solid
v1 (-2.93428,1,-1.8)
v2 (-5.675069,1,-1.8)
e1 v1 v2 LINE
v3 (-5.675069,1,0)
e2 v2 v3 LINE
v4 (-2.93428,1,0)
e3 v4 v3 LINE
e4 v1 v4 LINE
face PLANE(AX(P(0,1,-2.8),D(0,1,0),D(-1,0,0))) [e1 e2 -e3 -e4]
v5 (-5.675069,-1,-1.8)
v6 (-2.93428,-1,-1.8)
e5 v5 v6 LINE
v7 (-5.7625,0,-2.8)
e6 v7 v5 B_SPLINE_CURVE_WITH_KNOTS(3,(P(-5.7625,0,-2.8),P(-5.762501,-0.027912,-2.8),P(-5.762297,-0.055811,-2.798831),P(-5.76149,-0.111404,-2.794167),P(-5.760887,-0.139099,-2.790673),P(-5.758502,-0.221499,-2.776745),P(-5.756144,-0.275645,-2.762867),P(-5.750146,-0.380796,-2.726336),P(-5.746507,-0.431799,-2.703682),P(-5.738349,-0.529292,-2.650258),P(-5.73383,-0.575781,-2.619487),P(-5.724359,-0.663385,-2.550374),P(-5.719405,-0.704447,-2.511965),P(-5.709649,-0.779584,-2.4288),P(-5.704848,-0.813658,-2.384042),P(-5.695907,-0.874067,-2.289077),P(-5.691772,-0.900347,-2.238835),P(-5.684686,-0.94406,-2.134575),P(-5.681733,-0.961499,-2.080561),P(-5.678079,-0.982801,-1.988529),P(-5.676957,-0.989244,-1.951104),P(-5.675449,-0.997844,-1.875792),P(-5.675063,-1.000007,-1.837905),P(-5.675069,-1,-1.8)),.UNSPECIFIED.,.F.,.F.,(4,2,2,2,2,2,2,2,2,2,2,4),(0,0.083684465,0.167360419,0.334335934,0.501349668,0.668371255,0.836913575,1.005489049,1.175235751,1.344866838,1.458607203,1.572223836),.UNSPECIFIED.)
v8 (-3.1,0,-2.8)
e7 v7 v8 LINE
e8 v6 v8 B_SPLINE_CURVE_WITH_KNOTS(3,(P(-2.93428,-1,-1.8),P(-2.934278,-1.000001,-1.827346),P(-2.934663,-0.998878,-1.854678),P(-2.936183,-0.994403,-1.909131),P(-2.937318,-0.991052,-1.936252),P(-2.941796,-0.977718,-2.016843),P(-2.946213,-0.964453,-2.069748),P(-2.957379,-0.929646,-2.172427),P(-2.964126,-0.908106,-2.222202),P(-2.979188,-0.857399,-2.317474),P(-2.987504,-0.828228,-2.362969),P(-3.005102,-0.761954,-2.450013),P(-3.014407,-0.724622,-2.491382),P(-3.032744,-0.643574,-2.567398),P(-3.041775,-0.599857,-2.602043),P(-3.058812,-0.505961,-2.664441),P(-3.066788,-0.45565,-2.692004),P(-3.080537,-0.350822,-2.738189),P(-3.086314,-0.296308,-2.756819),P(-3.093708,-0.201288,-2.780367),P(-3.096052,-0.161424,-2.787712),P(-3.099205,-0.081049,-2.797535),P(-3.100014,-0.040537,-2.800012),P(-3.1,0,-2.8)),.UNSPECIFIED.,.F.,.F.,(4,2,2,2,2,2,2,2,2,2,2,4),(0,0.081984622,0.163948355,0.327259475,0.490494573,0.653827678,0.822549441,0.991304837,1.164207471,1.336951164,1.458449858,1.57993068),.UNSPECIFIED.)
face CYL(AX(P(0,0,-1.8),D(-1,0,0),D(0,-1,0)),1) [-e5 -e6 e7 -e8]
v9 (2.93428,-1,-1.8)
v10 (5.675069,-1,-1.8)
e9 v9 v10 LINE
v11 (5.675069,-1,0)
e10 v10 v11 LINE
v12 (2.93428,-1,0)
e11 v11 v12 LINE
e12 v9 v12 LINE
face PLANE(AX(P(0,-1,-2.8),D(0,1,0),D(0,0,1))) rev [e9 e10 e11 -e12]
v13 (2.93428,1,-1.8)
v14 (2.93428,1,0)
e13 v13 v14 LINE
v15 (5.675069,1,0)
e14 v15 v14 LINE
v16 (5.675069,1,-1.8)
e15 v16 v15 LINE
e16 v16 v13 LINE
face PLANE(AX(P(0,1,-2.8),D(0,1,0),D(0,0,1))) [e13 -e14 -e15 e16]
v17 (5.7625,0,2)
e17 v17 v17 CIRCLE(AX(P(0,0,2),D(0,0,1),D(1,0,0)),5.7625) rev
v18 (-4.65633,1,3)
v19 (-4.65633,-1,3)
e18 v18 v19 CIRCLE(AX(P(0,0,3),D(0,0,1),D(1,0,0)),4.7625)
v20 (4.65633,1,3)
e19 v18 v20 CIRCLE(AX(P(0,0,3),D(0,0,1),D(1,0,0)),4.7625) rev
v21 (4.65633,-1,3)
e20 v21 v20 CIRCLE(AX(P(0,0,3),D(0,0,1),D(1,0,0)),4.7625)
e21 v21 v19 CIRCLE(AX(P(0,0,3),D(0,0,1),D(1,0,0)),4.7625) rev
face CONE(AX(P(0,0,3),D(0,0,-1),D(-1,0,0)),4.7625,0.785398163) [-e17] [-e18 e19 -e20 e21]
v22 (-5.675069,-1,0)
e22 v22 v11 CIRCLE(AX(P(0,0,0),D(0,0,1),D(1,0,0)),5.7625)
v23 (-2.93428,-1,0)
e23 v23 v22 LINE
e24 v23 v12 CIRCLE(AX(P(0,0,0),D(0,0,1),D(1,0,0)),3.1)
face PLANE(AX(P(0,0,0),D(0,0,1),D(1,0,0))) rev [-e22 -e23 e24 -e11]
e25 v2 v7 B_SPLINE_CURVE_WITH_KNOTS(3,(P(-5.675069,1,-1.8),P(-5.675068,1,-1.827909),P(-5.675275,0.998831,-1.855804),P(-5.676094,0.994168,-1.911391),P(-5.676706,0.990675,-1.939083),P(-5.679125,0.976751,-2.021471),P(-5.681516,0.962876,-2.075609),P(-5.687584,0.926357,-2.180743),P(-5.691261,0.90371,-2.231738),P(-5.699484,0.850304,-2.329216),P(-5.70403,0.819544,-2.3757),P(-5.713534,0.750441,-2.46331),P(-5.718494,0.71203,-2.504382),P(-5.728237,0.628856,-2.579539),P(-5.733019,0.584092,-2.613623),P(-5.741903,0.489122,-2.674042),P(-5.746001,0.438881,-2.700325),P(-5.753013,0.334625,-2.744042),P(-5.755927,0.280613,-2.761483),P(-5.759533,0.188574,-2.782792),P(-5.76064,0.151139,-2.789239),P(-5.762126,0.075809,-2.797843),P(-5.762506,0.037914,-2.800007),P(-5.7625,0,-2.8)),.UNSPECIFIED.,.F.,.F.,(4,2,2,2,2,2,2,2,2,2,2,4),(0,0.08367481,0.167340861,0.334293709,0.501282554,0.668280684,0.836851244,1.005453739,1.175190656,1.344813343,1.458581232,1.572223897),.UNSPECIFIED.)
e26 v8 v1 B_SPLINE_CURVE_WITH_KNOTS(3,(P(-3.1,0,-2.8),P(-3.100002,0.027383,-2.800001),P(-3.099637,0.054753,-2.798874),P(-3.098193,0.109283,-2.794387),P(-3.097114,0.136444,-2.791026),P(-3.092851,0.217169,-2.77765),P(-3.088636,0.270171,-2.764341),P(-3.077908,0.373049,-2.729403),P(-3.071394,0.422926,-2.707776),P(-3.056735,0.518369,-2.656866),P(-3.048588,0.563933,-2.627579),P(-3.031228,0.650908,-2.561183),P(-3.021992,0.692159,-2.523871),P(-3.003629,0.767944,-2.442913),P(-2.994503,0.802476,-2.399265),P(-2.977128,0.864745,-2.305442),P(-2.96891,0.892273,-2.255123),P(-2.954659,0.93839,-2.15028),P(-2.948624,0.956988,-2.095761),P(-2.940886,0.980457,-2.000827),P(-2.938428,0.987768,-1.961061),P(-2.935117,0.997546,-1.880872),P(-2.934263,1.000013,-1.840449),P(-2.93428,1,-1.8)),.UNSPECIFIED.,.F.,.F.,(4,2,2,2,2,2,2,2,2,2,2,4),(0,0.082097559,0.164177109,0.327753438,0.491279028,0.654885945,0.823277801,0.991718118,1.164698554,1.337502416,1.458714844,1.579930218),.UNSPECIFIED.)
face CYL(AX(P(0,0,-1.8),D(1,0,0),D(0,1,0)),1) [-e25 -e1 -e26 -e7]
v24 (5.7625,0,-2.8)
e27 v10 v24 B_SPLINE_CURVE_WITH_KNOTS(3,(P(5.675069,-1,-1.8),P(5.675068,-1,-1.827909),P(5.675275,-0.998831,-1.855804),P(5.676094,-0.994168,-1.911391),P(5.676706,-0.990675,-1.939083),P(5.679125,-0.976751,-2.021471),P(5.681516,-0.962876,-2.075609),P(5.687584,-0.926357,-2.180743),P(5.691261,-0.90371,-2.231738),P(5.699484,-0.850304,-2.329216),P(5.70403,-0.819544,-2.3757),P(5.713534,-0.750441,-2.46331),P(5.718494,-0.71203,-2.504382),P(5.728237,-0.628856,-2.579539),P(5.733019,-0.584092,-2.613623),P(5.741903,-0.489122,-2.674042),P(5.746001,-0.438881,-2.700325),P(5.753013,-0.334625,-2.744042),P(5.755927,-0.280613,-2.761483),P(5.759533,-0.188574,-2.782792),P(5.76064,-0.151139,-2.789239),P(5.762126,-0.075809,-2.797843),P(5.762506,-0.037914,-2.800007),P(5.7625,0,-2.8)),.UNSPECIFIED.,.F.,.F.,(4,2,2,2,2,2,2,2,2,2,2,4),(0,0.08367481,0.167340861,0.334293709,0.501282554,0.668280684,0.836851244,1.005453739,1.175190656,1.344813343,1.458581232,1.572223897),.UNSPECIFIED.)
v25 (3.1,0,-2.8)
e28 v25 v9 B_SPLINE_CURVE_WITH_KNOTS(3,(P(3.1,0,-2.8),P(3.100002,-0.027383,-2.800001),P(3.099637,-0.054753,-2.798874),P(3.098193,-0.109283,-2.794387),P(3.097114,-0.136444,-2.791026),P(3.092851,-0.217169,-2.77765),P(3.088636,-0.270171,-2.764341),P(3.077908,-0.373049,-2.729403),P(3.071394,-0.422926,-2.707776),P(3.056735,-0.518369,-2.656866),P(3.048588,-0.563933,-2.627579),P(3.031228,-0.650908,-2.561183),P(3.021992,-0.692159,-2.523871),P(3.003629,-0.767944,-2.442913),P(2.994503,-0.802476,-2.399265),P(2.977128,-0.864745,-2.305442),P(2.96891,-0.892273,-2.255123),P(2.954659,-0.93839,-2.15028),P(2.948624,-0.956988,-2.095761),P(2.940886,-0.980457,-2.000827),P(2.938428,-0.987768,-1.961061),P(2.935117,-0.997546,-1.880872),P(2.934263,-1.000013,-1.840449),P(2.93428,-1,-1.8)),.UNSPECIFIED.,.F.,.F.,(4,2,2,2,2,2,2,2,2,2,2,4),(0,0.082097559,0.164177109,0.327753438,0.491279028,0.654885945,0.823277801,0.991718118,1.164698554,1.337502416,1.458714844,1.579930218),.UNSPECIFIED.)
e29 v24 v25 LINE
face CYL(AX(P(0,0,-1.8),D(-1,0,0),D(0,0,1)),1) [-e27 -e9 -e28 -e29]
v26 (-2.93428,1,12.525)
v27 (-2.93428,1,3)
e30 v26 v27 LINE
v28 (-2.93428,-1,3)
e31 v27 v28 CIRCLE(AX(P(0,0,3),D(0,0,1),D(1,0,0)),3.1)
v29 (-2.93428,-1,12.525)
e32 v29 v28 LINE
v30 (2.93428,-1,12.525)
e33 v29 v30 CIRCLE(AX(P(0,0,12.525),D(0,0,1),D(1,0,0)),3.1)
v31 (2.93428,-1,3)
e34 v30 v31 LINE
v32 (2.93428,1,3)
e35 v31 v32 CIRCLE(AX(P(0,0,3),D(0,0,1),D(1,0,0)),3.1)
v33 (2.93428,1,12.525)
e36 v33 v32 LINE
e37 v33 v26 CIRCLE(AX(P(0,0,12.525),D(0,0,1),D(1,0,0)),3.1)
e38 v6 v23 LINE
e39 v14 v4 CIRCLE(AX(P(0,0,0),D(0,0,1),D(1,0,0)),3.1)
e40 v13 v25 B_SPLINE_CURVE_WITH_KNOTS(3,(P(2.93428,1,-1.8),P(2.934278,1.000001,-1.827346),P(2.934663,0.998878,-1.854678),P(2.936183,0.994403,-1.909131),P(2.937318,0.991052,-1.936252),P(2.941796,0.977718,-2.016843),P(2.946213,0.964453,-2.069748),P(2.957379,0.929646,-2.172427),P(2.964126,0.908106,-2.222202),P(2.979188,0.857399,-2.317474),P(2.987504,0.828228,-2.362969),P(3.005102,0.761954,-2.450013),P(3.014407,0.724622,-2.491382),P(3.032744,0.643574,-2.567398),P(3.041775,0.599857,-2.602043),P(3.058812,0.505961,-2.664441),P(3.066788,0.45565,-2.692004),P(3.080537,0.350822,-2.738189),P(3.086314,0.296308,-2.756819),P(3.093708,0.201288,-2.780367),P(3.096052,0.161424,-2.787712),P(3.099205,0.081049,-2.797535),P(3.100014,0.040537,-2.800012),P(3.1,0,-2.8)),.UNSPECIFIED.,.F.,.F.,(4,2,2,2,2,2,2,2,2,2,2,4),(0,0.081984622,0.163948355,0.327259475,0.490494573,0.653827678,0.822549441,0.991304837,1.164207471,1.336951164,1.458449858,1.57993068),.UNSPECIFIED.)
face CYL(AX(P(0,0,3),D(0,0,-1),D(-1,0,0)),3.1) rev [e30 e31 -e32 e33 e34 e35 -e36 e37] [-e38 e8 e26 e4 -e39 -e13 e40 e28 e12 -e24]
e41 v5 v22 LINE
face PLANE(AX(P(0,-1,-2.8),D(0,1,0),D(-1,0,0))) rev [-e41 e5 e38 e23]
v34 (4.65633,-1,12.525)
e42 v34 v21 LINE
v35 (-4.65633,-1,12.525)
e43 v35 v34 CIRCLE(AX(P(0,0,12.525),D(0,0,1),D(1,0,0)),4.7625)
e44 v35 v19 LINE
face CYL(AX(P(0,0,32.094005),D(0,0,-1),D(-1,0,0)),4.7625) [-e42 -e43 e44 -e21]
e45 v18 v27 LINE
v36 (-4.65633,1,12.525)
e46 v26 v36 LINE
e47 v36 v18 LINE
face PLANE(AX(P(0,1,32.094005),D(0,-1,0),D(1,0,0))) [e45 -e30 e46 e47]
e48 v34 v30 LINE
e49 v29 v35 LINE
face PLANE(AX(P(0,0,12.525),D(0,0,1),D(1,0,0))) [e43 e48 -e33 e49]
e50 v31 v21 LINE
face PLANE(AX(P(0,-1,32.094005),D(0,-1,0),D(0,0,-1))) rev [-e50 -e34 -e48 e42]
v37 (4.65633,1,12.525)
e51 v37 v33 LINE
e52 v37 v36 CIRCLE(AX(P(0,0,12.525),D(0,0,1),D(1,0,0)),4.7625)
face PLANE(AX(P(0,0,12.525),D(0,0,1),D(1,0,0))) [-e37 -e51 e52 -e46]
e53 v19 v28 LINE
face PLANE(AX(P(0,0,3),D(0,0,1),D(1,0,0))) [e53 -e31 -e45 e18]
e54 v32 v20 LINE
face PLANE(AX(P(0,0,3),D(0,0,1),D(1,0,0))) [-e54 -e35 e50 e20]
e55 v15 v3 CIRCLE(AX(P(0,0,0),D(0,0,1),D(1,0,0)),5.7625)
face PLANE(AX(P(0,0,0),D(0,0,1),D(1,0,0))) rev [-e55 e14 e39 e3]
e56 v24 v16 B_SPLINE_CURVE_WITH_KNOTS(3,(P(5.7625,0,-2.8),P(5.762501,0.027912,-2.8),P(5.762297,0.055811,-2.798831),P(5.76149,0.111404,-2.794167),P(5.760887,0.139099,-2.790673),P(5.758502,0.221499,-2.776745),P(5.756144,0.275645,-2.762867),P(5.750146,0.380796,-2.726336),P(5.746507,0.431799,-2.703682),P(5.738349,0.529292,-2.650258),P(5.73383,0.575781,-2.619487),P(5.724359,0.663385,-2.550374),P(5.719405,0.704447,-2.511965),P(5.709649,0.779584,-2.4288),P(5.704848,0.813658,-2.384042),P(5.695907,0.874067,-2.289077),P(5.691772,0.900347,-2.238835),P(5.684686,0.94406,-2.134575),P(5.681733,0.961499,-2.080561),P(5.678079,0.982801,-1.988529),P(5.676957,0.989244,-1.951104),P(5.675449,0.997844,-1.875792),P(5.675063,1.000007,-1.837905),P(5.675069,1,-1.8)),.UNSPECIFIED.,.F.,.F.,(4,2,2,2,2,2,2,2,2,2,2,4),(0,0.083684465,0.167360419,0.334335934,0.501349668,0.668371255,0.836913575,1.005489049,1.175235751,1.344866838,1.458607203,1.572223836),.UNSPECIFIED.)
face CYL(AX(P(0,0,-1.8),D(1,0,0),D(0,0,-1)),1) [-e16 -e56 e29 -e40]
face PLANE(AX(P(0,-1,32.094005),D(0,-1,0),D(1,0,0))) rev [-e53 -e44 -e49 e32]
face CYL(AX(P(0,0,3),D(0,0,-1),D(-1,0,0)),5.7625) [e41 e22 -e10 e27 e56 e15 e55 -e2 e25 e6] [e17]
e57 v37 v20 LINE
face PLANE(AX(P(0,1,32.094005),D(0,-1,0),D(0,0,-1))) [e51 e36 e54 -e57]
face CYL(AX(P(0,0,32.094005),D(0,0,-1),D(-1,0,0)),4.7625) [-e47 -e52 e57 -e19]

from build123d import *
from build123d.topology import SkipClean

# Parameters (mm, degrees)
SKETCH1_R           = 5.7625
SKETCH1_R_2         = 4.7625
BOSS_EXTRUDE1_DEPTH = 3
BOSS_EXTRUDE2_DEPTH = 12.525
BOSS_EXTRUDE3_START = -2.8
BOSS_EXTRUDE3_DEPTH = 2.8
FILLET1_R           = 1
CHAMFER1_SIZE       = 1


with BuildPart() as part:
    # Sketch1 → Boss-Extrude1 (new body)
    # profile 1 of 9: a face of its own
    with BuildSketch(Plane.XY):
        Circle(SKETCH1_R)
        Circle(SKETCH1_R_2, mode=Mode.SUBTRACT)
    # profile 2 of 9: a face of its own
    with BuildSketch(Plane.XY):
        with BuildLine():
            Line((3.944328363, 1), (3.944328363, -1))
            Line((3.944328363, -1), (4.656329697, -1))
            ThreePointArc((4.656329697, -1), (4.735883045, -0.502810136), (4.7625, 0))
            ThreePointArc((4.7625, 0), (4.735883045, 0.502810136), (4.656329697, 1))
            Line((4.656329697, 1), (3.944328363, 1))
        make_face()
    # profile 3 of 9: a face of its own
    with BuildSketch(Plane.XY):
        with BuildLine():
            Line((2.93428015, -1), (3.944328363, -1))
            Line((3.944328363, -1), (3.944328363, 1))
            Line((3.944328363, 1), (2.93428015, 1))
            ThreePointArc((2.93428015, 1), (3.058289429, 0.506819265), (3.1, 0))
            ThreePointArc((3.1, 0), (3.058289429, -0.506819265), (2.93428015, -1))
        make_face()
    # profile 4 of 9: a face of its own
    with BuildSketch(Plane.XY):
        with BuildLine():
            Line((-4.656329697, -1), (-2.93428015, -1))
            ThreePointArc((-2.93428015, -1), (-3.1, 0), (-2.93428015, 1))
            Line((-2.93428015, 1), (-4.656329697, 1))
            ThreePointArc((-4.656329697, 1), (-4.7625, 0), (-4.656329697, -1))
        make_face()
    # profile 5 of 9: a face of its own
    with BuildSketch(Plane.XY):
        with BuildLine():
            Line((4.656329697, -1), (3.944328363, -1))
            Line((3.944328363, -1), (2.93428015, -1))
            ThreePointArc((2.93428015, -1), (0, -3.1), (-2.93428015, -1))
            Line((-2.93428015, -1), (-4.656329697, -1))
            ThreePointArc((-4.656329697, -1), (0, -4.7625), (4.656329697, -1))
        make_face()
    # profile 6 of 9: a face of its own
    with BuildSketch(Plane.XY):
        with BuildLine():
            Line((2.93428015, 1), (3.944328363, 1))
            Line((3.944328363, 1), (4.656329697, 1))
            ThreePointArc((4.656329697, 1), (0, 4.7625), (-4.656329697, 1))
            Line((-4.656329697, 1), (-2.93428015, 1))
            ThreePointArc((-2.93428015, 1), (0, 3.1), (2.93428015, 1))
        make_face()
    # profile 7 of 9: a face of its own
    with BuildSketch(Plane.XY):
        with BuildLine():
            ThreePointArc((4.7625, 0), (4.735883045, -0.502810136), (4.656329697, -1))
            Line((4.656329697, -1), (5.675068832, -1))
            ThreePointArc((5.675068832, -1), (5.740600596, -0.501907414), (5.7625, 0))
            ThreePointArc((5.7625, 0), (5.740600596, 0.501907414), (5.675068832, 1))
            Line((5.675068832, 1), (4.656329697, 1))
            ThreePointArc((4.656329697, 1), (4.735883045, 0.502810136), (4.7625, 0))
        make_face()
    # profile 8 of 9: a face of its own
    with BuildSketch(Plane.XY):
        with BuildLine():
            Line((5.675068832, -1), (4.656329697, -1))
            ThreePointArc((4.656329697, -1), (0, -4.7625), (-4.656329697, -1))
            Line((-4.656329697, -1), (-5.675068832, -1))
            ThreePointArc((-5.675068832, -1), (0, -5.7625), (5.675068832, -1))
        make_face()
    # profile 9 of 9: a face of its own
    with BuildSketch(Plane.XY):
        with BuildLine():
            Line((-5.675068832, -1), (-4.656329697, -1))
            ThreePointArc((-4.656329697, -1), (-4.7625, 0), (-4.656329697, 1))
            Line((-4.656329697, 1), (-5.675068832, 1))
            ThreePointArc((-5.675068832, 1), (-5.7625, 0), (-5.675068832, -1))
        make_face()
    extrude(amount=BOSS_EXTRUDE1_DEPTH)

    # Sketch1<9> → Boss-Extrude2 (add)
    with BuildSketch(Plane.XY):
        with BuildLine():
            Line((4.656329697, -1), (3.944328363, -1))
            Line((3.944328363, -1), (2.93428015, -1))
            ThreePointArc((2.93428015, -1), (0, -3.1), (-2.93428015, -1))
            Line((-2.93428015, -1), (-4.656329697, -1))
            ThreePointArc((-4.656329697, -1), (0, -4.7625), (4.656329697, -1))
        make_face()
        with BuildLine():
            Line((2.93428015, 1), (3.944328363, 1))
            Line((3.944328363, 1), (4.656329697, 1))
            ThreePointArc((4.656329697, 1), (0, 4.7625), (-4.656329697, 1))
            Line((-4.656329697, 1), (-2.93428015, 1))
            ThreePointArc((-2.93428015, 1), (0, 3.1), (2.93428015, 1))
        make_face()
    extrude(amount=BOSS_EXTRUDE2_DEPTH)

    # Sketch1<10> → Boss-Extrude3 (add)
    with SkipClean():  # the faces are left unmerged after this step: merging them gives an invalid solid
        with BuildSketch(Plane.XY.offset(BOSS_EXTRUDE3_START)):
            with BuildLine():
                Line((2.93428015, -1), (3.944328363, -1))
                Line((3.944328363, -1), (3.944328363, 1))
                Line((3.944328363, 1), (2.93428015, 1))
                ThreePointArc((2.93428015, 1), (3.058289429, 0.506819265), (3.1, 0))
                ThreePointArc((3.1, 0), (3.058289429, -0.506819265), (2.93428015, -1))
            make_face()
            with BuildLine():
                Line((3.944328363, 1), (3.944328363, -1))
                Line((3.944328363, -1), (4.656329697, -1))
                ThreePointArc((4.656329697, -1), (4.735883045, -0.502810136), (4.7625, 0))
                ThreePointArc((4.7625, 0), (4.735883045, 0.502810136), (4.656329697, 1))
                Line((4.656329697, 1), (3.944328363, 1))
            make_face()
            with BuildLine():
                Line((-4.656329697, -1), (-2.93428015, -1))
                ThreePointArc((-2.93428015, -1), (-3.1, 0), (-2.93428015, 1))
                Line((-2.93428015, 1), (-4.656329697, 1))
                ThreePointArc((-4.656329697, 1), (-4.7625, 0), (-4.656329697, -1))
            make_face()
            with BuildLine():
                ThreePointArc((4.7625, 0), (4.735883045, -0.502810136), (4.656329697, -1))
                Line((4.656329697, -1), (5.675068832, -1))
                ThreePointArc((5.675068832, -1), (5.740600596, -0.501907414), (5.7625, 0))
                ThreePointArc((5.7625, 0), (5.740600596, 0.501907414), (5.675068832, 1))
                Line((5.675068832, 1), (4.656329697, 1))
                ThreePointArc((4.656329697, 1), (4.735883045, 0.502810136), (4.7625, 0))
            make_face()
            with BuildLine():
                Line((-5.675068832, -1), (-4.656329697, -1))
                ThreePointArc((-4.656329697, -1), (-4.7625, 0), (-4.656329697, 1))
                Line((-4.656329697, 1), (-5.675068832, 1))
                ThreePointArc((-5.675068832, 1), (-5.7625, 0), (-5.675068832, -1))
            make_face()
        extrude(amount=BOSS_EXTRUDE3_DEPTH)

    # Fillet1
    fillet1_edges = [part.edges().sort_by_distance(p)[0] for p in [
        (-4.304674491, -1, -2.8),
        (-4.304674491, 1, -2.8),
        (4.304674491, 1, -2.8),
        (4.304674491, -1, -2.8),
    ]]
    fillet(fillet1_edges, radius=FILLET1_R - 0.0001)  # a hair under: the kernel refuses the full size

    # Chamfer1
    chamfer1_edges = [part.edges().sort_by_distance(p)[0] for p in [
        (-0.501907414, 5.740600596, 3),
    ]]
    chamfer(chamfer1_edges, length=CHAMFER1_SIZE - 0.0001)  # a hair under: the kernel refuses the full size


solid = part.part
